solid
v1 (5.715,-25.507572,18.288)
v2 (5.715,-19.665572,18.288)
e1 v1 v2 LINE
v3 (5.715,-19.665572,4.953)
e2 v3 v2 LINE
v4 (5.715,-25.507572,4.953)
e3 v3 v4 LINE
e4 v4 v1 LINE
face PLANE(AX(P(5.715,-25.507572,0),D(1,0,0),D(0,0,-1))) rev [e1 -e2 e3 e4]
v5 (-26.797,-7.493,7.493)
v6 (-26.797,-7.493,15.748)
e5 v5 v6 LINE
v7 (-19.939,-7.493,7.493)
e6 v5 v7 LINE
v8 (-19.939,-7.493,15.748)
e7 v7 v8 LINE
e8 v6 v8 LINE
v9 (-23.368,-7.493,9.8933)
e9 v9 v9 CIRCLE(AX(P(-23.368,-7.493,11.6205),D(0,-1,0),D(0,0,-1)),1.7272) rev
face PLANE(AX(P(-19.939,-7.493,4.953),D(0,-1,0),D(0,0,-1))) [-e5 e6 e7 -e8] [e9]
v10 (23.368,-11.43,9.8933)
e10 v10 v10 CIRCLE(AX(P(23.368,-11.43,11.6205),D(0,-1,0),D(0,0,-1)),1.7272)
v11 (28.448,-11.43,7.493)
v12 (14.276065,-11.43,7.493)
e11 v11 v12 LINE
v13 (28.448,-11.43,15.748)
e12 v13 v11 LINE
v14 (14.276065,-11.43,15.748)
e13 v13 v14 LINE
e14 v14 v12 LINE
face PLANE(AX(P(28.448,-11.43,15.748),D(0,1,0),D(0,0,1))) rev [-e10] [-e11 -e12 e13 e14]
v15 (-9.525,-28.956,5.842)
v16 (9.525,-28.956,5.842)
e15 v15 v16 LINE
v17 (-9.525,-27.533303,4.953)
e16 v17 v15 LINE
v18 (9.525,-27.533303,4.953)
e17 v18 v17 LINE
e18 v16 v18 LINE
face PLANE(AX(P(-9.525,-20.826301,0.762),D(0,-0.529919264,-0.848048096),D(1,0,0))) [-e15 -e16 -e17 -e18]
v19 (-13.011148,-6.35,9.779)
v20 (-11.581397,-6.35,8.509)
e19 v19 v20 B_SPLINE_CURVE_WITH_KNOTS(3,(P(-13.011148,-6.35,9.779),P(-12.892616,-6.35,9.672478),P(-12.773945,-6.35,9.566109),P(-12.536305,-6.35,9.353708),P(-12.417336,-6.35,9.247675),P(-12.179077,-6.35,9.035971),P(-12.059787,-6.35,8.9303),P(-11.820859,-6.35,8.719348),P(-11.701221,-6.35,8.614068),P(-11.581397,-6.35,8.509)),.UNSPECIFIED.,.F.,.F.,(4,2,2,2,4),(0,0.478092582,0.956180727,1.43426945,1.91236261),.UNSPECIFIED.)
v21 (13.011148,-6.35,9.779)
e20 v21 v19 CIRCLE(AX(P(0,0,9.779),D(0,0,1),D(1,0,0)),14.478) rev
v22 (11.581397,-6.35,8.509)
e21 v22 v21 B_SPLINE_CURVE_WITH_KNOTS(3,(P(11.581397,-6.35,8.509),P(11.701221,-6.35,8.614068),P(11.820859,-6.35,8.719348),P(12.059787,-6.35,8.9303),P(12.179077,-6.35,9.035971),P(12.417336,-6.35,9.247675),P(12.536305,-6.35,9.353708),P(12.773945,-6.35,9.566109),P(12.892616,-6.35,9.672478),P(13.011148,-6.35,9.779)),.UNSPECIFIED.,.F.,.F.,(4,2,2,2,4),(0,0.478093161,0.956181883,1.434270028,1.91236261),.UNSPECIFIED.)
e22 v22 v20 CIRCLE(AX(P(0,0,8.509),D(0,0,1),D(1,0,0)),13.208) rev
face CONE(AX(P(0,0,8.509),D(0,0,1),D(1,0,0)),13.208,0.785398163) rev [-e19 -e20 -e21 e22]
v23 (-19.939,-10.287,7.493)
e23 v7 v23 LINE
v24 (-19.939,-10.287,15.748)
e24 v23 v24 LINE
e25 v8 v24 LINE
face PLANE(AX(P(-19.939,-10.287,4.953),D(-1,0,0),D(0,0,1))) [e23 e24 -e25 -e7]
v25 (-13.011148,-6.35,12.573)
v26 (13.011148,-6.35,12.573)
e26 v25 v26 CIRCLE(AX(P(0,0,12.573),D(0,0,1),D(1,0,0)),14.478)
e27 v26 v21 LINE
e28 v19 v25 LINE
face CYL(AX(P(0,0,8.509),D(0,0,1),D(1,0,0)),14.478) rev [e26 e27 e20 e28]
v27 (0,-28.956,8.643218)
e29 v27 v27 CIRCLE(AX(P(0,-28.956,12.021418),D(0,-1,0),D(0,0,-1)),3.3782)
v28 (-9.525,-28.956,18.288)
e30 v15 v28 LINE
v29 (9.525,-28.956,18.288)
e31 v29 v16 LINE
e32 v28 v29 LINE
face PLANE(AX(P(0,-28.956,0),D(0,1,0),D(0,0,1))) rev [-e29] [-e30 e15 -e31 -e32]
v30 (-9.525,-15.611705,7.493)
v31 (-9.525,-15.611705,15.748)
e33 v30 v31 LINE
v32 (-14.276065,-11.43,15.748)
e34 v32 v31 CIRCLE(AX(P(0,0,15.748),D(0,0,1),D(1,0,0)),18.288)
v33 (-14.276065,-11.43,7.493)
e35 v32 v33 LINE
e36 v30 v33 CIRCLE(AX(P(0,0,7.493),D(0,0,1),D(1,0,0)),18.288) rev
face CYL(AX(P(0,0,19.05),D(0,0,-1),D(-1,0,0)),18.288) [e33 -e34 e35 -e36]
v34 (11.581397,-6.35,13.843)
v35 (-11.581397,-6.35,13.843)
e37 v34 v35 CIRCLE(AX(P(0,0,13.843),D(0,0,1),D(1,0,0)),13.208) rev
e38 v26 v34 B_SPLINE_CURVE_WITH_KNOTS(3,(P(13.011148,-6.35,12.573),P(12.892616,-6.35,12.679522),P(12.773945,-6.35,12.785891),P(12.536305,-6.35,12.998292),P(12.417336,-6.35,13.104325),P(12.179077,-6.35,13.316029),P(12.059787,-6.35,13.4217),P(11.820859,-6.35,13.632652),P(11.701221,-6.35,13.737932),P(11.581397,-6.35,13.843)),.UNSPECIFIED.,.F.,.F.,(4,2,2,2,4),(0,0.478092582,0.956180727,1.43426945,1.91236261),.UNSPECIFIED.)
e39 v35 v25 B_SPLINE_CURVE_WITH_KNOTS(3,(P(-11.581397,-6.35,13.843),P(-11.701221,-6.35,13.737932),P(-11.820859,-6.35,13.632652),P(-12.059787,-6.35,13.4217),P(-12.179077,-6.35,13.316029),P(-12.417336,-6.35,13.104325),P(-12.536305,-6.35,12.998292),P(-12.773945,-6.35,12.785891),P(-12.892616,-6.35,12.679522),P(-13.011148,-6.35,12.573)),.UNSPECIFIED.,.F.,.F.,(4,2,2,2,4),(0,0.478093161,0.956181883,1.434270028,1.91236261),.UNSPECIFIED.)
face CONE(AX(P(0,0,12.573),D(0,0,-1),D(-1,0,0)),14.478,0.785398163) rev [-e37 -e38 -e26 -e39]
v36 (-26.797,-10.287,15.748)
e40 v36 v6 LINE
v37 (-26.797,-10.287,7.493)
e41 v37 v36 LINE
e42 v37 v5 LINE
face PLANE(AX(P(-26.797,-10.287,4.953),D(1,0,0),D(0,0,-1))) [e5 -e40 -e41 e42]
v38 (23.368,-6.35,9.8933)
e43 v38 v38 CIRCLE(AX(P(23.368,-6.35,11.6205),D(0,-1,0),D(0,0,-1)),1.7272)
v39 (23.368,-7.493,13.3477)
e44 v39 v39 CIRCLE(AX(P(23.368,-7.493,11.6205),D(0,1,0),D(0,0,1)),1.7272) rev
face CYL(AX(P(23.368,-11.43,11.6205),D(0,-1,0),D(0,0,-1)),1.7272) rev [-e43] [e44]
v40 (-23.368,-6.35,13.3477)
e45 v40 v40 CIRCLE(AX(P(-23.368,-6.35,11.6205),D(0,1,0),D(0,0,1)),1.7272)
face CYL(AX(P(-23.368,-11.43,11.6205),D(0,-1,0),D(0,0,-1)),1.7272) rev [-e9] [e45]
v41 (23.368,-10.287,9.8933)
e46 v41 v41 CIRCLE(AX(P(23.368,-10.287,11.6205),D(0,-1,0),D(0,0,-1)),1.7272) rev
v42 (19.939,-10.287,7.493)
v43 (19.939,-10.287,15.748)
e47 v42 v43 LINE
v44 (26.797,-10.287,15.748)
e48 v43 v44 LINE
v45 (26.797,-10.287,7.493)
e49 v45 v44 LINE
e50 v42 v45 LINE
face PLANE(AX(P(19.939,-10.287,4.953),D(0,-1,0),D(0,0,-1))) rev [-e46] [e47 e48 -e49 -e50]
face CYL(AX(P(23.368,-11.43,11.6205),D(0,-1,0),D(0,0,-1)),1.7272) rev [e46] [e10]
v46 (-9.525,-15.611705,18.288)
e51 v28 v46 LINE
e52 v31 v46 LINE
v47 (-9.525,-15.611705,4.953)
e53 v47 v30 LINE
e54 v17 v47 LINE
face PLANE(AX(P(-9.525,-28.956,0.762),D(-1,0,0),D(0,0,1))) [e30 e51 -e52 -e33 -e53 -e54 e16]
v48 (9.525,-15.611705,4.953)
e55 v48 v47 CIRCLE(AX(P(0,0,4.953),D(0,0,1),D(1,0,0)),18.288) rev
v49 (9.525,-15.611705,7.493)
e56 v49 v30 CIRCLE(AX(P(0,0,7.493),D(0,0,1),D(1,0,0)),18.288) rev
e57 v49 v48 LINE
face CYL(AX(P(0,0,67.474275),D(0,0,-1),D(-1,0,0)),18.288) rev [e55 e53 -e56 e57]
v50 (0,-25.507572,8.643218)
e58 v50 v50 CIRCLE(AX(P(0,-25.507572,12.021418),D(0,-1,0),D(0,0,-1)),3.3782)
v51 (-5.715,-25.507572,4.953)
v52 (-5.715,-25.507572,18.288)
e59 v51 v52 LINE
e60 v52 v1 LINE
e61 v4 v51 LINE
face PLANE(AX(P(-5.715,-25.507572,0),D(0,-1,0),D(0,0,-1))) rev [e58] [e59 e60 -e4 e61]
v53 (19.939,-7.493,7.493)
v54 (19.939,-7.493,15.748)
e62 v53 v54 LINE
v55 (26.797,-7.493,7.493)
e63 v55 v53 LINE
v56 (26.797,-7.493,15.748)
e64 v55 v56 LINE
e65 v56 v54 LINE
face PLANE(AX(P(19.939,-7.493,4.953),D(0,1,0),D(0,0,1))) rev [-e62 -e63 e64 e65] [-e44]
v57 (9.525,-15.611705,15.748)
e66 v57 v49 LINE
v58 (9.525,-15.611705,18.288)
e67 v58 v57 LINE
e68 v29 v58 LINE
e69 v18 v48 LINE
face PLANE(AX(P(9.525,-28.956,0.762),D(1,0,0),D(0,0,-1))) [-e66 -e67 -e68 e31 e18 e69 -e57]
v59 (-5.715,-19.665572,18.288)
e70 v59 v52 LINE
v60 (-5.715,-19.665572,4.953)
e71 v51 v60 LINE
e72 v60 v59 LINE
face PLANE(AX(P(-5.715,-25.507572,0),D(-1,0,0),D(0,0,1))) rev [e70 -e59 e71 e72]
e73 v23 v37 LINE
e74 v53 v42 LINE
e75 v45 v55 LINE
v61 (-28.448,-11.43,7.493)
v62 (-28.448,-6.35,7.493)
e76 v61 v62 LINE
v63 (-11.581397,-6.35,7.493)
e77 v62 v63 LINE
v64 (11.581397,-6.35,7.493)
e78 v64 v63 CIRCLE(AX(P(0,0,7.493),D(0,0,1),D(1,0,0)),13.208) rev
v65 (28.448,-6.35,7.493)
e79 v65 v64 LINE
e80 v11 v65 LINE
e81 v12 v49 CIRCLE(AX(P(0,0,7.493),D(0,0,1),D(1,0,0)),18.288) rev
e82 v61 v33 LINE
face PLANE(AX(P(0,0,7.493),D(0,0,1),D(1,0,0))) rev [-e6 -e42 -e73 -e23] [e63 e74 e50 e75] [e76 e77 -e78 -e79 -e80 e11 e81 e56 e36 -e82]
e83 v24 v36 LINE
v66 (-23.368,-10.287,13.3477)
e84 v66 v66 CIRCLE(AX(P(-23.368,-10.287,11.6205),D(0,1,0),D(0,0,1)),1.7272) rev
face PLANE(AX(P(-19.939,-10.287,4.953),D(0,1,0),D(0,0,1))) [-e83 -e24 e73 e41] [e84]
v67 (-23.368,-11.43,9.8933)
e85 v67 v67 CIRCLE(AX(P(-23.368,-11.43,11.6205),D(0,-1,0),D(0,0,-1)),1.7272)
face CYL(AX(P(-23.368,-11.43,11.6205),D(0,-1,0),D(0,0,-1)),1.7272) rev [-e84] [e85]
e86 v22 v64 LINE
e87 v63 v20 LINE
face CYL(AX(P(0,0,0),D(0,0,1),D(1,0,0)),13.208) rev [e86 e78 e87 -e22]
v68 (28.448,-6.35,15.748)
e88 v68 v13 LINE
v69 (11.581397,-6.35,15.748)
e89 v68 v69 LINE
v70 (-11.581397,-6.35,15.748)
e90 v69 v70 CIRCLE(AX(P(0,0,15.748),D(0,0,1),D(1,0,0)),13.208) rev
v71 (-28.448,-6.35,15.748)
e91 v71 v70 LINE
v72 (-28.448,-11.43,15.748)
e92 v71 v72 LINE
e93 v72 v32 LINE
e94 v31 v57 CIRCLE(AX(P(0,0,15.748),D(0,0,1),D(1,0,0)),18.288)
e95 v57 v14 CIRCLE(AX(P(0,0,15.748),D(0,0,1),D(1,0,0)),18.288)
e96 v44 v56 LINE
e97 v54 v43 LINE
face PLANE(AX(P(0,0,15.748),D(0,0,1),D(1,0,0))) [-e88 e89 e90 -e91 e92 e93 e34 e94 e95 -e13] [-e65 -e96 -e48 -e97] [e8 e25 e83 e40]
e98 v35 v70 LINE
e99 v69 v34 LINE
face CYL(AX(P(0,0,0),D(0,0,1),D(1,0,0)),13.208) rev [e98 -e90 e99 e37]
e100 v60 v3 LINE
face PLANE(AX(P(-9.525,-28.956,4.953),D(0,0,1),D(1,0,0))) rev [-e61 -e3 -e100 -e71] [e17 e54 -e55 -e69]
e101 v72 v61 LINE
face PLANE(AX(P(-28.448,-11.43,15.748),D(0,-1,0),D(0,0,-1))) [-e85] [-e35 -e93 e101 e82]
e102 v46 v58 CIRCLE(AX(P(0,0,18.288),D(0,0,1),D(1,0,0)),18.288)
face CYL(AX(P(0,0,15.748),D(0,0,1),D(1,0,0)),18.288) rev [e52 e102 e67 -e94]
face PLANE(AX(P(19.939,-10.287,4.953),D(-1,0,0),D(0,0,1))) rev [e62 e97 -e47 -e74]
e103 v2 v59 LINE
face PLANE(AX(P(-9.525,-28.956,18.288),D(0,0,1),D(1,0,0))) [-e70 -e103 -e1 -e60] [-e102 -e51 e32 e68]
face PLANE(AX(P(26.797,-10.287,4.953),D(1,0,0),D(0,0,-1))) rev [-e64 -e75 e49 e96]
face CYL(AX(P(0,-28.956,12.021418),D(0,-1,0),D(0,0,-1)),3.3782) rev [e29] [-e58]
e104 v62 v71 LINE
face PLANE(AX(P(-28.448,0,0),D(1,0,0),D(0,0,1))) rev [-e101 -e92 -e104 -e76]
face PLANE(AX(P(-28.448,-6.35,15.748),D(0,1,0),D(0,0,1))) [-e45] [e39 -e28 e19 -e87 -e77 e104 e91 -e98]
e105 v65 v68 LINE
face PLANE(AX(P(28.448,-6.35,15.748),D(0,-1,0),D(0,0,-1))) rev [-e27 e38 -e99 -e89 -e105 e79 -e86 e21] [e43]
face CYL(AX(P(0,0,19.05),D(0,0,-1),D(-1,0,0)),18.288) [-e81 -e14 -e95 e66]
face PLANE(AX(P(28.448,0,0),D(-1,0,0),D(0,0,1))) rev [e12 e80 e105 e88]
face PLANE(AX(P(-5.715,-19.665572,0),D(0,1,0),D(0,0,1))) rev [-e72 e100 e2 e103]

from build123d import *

# Parameters (mm, degrees)
SKETCH1_R                   = 18.288
BOSS_EXTRUDE1_DEPTH         = 19.05
SKETCH3_R                   = 13.208
CUT_EXTRUDE1_DEPTH          = 33.121712096
SKETCH15_W                  = 19.05
SKETCH15_H                  = 17.526
BOSS_EXTRUDE3_DEPTH         = 15.24
SKETCH16_W                  = 11.43
SKETCH16_H                  = 5.842
CUT_EXTRUDE4_DEPTH          = 39.82462909
CHAMFER1_SIZE               = 8.129699408
CHAMFER1_SIZE_2             = 5.08
F_1_4_CLEARANCE_HOLE1_D     = 6.7564
F_1_4_CLEARANCE_HOLE1_DEPTH = 3.448428068
SKETCH19_R                  = 18.288
SKETCH19_R_2                = 13.208
CUT_EXTRUDE5_DEPTH          = 0.762
CUT_EXTRUDE6_START          = -2.54
SKETCH20_R                  = 18.288
CUT_EXTRUDE6_DEPTH          = 2.54
SKETCH21_R                  = 18.288
CUT_EXTRUDE7_DEPTH          = 7.493
SKETCH22_W                  = 19.05
SKETCH22_H                  = 4.191
CUT_EXTRUDE8_DEPTH          = 42.148
SKETCH24_R                  = 14.478
CUT_EXTRUDE10_DEPTH         = 5.334
SKETCH25_W                  = 8.255
SKETCH25_H                  = 5.08
BOSS_EXTRUDE4_DEPTH         = 15.24
F_4_CLEARANCE_HOLE1_D       = 3.4544
SKETCH28_W                  = 6.858
SKETCH28_H                  = 2.794
CUT_EXTRUDE11_DEPTH         = 43.003222079
MIRROR3_COPY_1_SKETCH_W     = 6.858
MIRROR3_COPY_1_SKETCH_H     = 2.794
MIRROR3_COPY_1_DEPTH        = 43.003222079
SKETCH30_W                  = 69.645379109
SKETCH30_H                  = 31.008453513
CUT_EXTRUDE13_DEPTH         = 24.638
CHAMFER2_SIZE               = 1.27


# Some blends are built 0.0001 mm under size
with BuildPart() as part:
    # Sketch1 → Boss-Extrude1 (new body)
    with BuildSketch(Plane.XY):
        with Locations(Location((0, 0, 0), (0, 0, 180))):
            Circle(SKETCH1_R)
    extrude(amount=BOSS_EXTRUDE1_DEPTH)

    # Sketch3 → Cut-Extrude1 (cut, through all)
    with BuildSketch(Plane.XY.offset(19.05)):
        Circle(SKETCH3_R)
    extrude(amount=-CUT_EXTRUDE1_DEPTH, mode=Mode.SUBTRACT)

    # Sketch15 → Boss-Extrude3 (add)
    with BuildSketch(Plane(origin=(0, -13.716, 0), x_dir=(1, 0, 0), z_dir=(0, 1, 0))):
        with Locations((0, -9.525)):
            Rectangle(SKETCH15_W, SKETCH15_H)
    extrude(amount=-BOSS_EXTRUDE3_DEPTH)

    # Sketch16 → Cut-Extrude4 (cut, through all)
    with BuildSketch(Plane.XY.offset(18.288)):
        with Locations((0, -22.586571932)):
            Rectangle(SKETCH16_W, SKETCH16_H)
    extrude(amount=-CUT_EXTRUDE4_DEPTH, mode=Mode.SUBTRACT)

    # Chamfer1
    # the kernel refuses this chamfer: 8.129699408, 5.08 mm, written as the material it takes off along each edge
    with BuildSketch(Plane(origin=(-30.543101737, -28.956, 0.762), x_dir=(0, 0.9997899140358644, -0.020497019104217945), z_dir=(1, 0, 0))) as chamfer1_piece_1:
        Polygon((CHAMFER1_SIZE * 0.999789913978, CHAMFER1_SIZE * 0.020497019103), (-CHAMFER1_SIZE_2 * 0.0204970191042, CHAMFER1_SIZE_2 * 0.999789914036), (0, 0), align=None)
    extrude(amount=61.086203475, mode=Mode.SUBTRACT)

    # 1/4 Clearance Hole1
    with Locations(Plane(origin=(0, -28.956, 0), x_dir=(-1, 0, 0), z_dir=(0, -1, 0))):
        with Locations((0, -12.021417661)):
            Hole(F_1_4_CLEARANCE_HOLE1_D / 2, depth=F_1_4_CLEARANCE_HOLE1_DEPTH)

    # Sketch19 → Cut-Extrude5 (cut)
    with BuildSketch(Plane.XY.offset(19.05)):
        with Locations(Location((0, 0, 0), (0, 0, 238.611833536))):
            Circle(SKETCH19_R)
        Circle(SKETCH19_R_2, mode=Mode.SUBTRACT)
    extrude(amount=-CUT_EXTRUDE5_DEPTH, mode=Mode.SUBTRACT)

    # Sketch20 → Cut-Extrude6 (cut)
    with BuildSketch(Plane.XY.offset(18.288).offset(CUT_EXTRUDE6_START)):
        with Locations(Location((0, 0, 0), (0, 0, 238.611833536))):
            Circle(SKETCH20_R)
    extrude(amount=CUT_EXTRUDE6_DEPTH, mode=Mode.SUBTRACT)

    # Sketch21 → Cut-Extrude7 (cut)
    with BuildSketch(Plane(origin=(0, 0, 0), x_dir=(-1, 0, 0), z_dir=(0, 0, -1))):
        Circle(SKETCH21_R)
    extrude(amount=-CUT_EXTRUDE7_DEPTH, mode=Mode.SUBTRACT)

    # Sketch22 → Cut-Extrude8 (cut, through all)
    with BuildSketch(Plane(origin=(0, -13.716, 0), x_dir=(1, 0, 0), z_dir=(0, 1, 0))):
        with Locations((0, -2.8575)):
            Rectangle(SKETCH22_W, SKETCH22_H)
    extrude(amount=-CUT_EXTRUDE8_DEPTH, mode=Mode.SUBTRACT)

    # Sketch24 → Cut-Extrude10 (cut)
    with BuildSketch(Plane.XY.offset(13.843)):
        Circle(SKETCH24_R)
    extrude(amount=-CUT_EXTRUDE10_DEPTH, mode=Mode.SUBTRACT)

    # Sketch25 → Boss-Extrude4 (add)
    with BuildSketch(Plane(origin=(13.208, 0, 0), x_dir=(0, 0, -1), z_dir=(1, 0, 0))):
        with Locations((-11.6205, 8.89)):
            Rectangle(SKETCH25_W, SKETCH25_H)
        with Locations((-11.6205, -8.89)):
            Rectangle(SKETCH25_W, SKETCH25_H)
    boss_extrude4 = extrude(amount=BOSS_EXTRUDE4_DEPTH)

    # #4 Clearance Hole1 (through all)
    with Locations(Plane(origin=(0, -11.43, 0), x_dir=(-1, 0, 0), z_dir=(0, -1, 0))):
        with Locations((-23.368, -11.6205)):
            f_4_clearance_hole1 = Hole(F_4_CLEARANCE_HOLE1_D / 2)

    # Sketch28 → Cut-Extrude11 (cut, through all)
    with BuildSketch(Plane.XY.offset(15.748)):
        with Locations((23.368, -8.89)):
            Rectangle(SKETCH28_W, SKETCH28_H)
    cut_extrude11 = extrude(amount=-CUT_EXTRUDE11_DEPTH, mode=Mode.SUBTRACT)

    # Mirror2: Cut-Extrude11 across plane
    add(cut_extrude11.mirror(Plane.ZX), mode=Mode.SUBTRACT)

    # Mirror3: Boss-Extrude4, #4 Clearance Hole1, Cut-Extrude11 across plane
    add(boss_extrude4.mirror(Plane(origin=(0, 0, 0), x_dir=(0, 0, 1), z_dir=(1, 0, 0))))
    add(f_4_clearance_hole1.mirror(Plane(origin=(0, 0, 0), x_dir=(0, 0, 1), z_dir=(1, 0, 0))), mode=Mode.SUBTRACT)
    add(cut_extrude11.mirror(Plane(origin=(0, 0, 0), x_dir=(0, 0, 1), z_dir=(1, 0, 0))), mode=Mode.SUBTRACT)

    # Mirror3 copy 1 sketch → Mirror3 copy 1 (cut, through all)
    with BuildSketch(Plane(origin=(0, 0, 15.748), x_dir=(-1, 0, 0), z_dir=(0, 0, 1))):
        with Locations((23.368, -8.89)):
            Rectangle(MIRROR3_COPY_1_SKETCH_W, MIRROR3_COPY_1_SKETCH_H)
    extrude(amount=-MIRROR3_COPY_1_DEPTH, mode=Mode.SUBTRACT)

    # Sketch30 → Cut-Extrude13 (cut)
    with BuildSketch(Plane(origin=(0, 18.288, 0), x_dir=(1, 0, 0), z_dir=(0, 1, 0))):
        with Locations((0.103127413, -15.504226757)):
            Rectangle(SKETCH30_W, SKETCH30_H)
    extrude(amount=-CUT_EXTRUDE13_DEPTH, mode=Mode.SUBTRACT)

    # Chamfer2
    chamfer2_edges = [part.edges().sort_by_distance(p)[0] for p in [
        (0, -14.478, 13.843),
        (0, -14.478, 8.509),
    ]]
    chamfer(chamfer2_edges, length=CHAMFER2_SIZE - 0.0001)  # a hair under: the kernel refuses the full size


solid = part.part
